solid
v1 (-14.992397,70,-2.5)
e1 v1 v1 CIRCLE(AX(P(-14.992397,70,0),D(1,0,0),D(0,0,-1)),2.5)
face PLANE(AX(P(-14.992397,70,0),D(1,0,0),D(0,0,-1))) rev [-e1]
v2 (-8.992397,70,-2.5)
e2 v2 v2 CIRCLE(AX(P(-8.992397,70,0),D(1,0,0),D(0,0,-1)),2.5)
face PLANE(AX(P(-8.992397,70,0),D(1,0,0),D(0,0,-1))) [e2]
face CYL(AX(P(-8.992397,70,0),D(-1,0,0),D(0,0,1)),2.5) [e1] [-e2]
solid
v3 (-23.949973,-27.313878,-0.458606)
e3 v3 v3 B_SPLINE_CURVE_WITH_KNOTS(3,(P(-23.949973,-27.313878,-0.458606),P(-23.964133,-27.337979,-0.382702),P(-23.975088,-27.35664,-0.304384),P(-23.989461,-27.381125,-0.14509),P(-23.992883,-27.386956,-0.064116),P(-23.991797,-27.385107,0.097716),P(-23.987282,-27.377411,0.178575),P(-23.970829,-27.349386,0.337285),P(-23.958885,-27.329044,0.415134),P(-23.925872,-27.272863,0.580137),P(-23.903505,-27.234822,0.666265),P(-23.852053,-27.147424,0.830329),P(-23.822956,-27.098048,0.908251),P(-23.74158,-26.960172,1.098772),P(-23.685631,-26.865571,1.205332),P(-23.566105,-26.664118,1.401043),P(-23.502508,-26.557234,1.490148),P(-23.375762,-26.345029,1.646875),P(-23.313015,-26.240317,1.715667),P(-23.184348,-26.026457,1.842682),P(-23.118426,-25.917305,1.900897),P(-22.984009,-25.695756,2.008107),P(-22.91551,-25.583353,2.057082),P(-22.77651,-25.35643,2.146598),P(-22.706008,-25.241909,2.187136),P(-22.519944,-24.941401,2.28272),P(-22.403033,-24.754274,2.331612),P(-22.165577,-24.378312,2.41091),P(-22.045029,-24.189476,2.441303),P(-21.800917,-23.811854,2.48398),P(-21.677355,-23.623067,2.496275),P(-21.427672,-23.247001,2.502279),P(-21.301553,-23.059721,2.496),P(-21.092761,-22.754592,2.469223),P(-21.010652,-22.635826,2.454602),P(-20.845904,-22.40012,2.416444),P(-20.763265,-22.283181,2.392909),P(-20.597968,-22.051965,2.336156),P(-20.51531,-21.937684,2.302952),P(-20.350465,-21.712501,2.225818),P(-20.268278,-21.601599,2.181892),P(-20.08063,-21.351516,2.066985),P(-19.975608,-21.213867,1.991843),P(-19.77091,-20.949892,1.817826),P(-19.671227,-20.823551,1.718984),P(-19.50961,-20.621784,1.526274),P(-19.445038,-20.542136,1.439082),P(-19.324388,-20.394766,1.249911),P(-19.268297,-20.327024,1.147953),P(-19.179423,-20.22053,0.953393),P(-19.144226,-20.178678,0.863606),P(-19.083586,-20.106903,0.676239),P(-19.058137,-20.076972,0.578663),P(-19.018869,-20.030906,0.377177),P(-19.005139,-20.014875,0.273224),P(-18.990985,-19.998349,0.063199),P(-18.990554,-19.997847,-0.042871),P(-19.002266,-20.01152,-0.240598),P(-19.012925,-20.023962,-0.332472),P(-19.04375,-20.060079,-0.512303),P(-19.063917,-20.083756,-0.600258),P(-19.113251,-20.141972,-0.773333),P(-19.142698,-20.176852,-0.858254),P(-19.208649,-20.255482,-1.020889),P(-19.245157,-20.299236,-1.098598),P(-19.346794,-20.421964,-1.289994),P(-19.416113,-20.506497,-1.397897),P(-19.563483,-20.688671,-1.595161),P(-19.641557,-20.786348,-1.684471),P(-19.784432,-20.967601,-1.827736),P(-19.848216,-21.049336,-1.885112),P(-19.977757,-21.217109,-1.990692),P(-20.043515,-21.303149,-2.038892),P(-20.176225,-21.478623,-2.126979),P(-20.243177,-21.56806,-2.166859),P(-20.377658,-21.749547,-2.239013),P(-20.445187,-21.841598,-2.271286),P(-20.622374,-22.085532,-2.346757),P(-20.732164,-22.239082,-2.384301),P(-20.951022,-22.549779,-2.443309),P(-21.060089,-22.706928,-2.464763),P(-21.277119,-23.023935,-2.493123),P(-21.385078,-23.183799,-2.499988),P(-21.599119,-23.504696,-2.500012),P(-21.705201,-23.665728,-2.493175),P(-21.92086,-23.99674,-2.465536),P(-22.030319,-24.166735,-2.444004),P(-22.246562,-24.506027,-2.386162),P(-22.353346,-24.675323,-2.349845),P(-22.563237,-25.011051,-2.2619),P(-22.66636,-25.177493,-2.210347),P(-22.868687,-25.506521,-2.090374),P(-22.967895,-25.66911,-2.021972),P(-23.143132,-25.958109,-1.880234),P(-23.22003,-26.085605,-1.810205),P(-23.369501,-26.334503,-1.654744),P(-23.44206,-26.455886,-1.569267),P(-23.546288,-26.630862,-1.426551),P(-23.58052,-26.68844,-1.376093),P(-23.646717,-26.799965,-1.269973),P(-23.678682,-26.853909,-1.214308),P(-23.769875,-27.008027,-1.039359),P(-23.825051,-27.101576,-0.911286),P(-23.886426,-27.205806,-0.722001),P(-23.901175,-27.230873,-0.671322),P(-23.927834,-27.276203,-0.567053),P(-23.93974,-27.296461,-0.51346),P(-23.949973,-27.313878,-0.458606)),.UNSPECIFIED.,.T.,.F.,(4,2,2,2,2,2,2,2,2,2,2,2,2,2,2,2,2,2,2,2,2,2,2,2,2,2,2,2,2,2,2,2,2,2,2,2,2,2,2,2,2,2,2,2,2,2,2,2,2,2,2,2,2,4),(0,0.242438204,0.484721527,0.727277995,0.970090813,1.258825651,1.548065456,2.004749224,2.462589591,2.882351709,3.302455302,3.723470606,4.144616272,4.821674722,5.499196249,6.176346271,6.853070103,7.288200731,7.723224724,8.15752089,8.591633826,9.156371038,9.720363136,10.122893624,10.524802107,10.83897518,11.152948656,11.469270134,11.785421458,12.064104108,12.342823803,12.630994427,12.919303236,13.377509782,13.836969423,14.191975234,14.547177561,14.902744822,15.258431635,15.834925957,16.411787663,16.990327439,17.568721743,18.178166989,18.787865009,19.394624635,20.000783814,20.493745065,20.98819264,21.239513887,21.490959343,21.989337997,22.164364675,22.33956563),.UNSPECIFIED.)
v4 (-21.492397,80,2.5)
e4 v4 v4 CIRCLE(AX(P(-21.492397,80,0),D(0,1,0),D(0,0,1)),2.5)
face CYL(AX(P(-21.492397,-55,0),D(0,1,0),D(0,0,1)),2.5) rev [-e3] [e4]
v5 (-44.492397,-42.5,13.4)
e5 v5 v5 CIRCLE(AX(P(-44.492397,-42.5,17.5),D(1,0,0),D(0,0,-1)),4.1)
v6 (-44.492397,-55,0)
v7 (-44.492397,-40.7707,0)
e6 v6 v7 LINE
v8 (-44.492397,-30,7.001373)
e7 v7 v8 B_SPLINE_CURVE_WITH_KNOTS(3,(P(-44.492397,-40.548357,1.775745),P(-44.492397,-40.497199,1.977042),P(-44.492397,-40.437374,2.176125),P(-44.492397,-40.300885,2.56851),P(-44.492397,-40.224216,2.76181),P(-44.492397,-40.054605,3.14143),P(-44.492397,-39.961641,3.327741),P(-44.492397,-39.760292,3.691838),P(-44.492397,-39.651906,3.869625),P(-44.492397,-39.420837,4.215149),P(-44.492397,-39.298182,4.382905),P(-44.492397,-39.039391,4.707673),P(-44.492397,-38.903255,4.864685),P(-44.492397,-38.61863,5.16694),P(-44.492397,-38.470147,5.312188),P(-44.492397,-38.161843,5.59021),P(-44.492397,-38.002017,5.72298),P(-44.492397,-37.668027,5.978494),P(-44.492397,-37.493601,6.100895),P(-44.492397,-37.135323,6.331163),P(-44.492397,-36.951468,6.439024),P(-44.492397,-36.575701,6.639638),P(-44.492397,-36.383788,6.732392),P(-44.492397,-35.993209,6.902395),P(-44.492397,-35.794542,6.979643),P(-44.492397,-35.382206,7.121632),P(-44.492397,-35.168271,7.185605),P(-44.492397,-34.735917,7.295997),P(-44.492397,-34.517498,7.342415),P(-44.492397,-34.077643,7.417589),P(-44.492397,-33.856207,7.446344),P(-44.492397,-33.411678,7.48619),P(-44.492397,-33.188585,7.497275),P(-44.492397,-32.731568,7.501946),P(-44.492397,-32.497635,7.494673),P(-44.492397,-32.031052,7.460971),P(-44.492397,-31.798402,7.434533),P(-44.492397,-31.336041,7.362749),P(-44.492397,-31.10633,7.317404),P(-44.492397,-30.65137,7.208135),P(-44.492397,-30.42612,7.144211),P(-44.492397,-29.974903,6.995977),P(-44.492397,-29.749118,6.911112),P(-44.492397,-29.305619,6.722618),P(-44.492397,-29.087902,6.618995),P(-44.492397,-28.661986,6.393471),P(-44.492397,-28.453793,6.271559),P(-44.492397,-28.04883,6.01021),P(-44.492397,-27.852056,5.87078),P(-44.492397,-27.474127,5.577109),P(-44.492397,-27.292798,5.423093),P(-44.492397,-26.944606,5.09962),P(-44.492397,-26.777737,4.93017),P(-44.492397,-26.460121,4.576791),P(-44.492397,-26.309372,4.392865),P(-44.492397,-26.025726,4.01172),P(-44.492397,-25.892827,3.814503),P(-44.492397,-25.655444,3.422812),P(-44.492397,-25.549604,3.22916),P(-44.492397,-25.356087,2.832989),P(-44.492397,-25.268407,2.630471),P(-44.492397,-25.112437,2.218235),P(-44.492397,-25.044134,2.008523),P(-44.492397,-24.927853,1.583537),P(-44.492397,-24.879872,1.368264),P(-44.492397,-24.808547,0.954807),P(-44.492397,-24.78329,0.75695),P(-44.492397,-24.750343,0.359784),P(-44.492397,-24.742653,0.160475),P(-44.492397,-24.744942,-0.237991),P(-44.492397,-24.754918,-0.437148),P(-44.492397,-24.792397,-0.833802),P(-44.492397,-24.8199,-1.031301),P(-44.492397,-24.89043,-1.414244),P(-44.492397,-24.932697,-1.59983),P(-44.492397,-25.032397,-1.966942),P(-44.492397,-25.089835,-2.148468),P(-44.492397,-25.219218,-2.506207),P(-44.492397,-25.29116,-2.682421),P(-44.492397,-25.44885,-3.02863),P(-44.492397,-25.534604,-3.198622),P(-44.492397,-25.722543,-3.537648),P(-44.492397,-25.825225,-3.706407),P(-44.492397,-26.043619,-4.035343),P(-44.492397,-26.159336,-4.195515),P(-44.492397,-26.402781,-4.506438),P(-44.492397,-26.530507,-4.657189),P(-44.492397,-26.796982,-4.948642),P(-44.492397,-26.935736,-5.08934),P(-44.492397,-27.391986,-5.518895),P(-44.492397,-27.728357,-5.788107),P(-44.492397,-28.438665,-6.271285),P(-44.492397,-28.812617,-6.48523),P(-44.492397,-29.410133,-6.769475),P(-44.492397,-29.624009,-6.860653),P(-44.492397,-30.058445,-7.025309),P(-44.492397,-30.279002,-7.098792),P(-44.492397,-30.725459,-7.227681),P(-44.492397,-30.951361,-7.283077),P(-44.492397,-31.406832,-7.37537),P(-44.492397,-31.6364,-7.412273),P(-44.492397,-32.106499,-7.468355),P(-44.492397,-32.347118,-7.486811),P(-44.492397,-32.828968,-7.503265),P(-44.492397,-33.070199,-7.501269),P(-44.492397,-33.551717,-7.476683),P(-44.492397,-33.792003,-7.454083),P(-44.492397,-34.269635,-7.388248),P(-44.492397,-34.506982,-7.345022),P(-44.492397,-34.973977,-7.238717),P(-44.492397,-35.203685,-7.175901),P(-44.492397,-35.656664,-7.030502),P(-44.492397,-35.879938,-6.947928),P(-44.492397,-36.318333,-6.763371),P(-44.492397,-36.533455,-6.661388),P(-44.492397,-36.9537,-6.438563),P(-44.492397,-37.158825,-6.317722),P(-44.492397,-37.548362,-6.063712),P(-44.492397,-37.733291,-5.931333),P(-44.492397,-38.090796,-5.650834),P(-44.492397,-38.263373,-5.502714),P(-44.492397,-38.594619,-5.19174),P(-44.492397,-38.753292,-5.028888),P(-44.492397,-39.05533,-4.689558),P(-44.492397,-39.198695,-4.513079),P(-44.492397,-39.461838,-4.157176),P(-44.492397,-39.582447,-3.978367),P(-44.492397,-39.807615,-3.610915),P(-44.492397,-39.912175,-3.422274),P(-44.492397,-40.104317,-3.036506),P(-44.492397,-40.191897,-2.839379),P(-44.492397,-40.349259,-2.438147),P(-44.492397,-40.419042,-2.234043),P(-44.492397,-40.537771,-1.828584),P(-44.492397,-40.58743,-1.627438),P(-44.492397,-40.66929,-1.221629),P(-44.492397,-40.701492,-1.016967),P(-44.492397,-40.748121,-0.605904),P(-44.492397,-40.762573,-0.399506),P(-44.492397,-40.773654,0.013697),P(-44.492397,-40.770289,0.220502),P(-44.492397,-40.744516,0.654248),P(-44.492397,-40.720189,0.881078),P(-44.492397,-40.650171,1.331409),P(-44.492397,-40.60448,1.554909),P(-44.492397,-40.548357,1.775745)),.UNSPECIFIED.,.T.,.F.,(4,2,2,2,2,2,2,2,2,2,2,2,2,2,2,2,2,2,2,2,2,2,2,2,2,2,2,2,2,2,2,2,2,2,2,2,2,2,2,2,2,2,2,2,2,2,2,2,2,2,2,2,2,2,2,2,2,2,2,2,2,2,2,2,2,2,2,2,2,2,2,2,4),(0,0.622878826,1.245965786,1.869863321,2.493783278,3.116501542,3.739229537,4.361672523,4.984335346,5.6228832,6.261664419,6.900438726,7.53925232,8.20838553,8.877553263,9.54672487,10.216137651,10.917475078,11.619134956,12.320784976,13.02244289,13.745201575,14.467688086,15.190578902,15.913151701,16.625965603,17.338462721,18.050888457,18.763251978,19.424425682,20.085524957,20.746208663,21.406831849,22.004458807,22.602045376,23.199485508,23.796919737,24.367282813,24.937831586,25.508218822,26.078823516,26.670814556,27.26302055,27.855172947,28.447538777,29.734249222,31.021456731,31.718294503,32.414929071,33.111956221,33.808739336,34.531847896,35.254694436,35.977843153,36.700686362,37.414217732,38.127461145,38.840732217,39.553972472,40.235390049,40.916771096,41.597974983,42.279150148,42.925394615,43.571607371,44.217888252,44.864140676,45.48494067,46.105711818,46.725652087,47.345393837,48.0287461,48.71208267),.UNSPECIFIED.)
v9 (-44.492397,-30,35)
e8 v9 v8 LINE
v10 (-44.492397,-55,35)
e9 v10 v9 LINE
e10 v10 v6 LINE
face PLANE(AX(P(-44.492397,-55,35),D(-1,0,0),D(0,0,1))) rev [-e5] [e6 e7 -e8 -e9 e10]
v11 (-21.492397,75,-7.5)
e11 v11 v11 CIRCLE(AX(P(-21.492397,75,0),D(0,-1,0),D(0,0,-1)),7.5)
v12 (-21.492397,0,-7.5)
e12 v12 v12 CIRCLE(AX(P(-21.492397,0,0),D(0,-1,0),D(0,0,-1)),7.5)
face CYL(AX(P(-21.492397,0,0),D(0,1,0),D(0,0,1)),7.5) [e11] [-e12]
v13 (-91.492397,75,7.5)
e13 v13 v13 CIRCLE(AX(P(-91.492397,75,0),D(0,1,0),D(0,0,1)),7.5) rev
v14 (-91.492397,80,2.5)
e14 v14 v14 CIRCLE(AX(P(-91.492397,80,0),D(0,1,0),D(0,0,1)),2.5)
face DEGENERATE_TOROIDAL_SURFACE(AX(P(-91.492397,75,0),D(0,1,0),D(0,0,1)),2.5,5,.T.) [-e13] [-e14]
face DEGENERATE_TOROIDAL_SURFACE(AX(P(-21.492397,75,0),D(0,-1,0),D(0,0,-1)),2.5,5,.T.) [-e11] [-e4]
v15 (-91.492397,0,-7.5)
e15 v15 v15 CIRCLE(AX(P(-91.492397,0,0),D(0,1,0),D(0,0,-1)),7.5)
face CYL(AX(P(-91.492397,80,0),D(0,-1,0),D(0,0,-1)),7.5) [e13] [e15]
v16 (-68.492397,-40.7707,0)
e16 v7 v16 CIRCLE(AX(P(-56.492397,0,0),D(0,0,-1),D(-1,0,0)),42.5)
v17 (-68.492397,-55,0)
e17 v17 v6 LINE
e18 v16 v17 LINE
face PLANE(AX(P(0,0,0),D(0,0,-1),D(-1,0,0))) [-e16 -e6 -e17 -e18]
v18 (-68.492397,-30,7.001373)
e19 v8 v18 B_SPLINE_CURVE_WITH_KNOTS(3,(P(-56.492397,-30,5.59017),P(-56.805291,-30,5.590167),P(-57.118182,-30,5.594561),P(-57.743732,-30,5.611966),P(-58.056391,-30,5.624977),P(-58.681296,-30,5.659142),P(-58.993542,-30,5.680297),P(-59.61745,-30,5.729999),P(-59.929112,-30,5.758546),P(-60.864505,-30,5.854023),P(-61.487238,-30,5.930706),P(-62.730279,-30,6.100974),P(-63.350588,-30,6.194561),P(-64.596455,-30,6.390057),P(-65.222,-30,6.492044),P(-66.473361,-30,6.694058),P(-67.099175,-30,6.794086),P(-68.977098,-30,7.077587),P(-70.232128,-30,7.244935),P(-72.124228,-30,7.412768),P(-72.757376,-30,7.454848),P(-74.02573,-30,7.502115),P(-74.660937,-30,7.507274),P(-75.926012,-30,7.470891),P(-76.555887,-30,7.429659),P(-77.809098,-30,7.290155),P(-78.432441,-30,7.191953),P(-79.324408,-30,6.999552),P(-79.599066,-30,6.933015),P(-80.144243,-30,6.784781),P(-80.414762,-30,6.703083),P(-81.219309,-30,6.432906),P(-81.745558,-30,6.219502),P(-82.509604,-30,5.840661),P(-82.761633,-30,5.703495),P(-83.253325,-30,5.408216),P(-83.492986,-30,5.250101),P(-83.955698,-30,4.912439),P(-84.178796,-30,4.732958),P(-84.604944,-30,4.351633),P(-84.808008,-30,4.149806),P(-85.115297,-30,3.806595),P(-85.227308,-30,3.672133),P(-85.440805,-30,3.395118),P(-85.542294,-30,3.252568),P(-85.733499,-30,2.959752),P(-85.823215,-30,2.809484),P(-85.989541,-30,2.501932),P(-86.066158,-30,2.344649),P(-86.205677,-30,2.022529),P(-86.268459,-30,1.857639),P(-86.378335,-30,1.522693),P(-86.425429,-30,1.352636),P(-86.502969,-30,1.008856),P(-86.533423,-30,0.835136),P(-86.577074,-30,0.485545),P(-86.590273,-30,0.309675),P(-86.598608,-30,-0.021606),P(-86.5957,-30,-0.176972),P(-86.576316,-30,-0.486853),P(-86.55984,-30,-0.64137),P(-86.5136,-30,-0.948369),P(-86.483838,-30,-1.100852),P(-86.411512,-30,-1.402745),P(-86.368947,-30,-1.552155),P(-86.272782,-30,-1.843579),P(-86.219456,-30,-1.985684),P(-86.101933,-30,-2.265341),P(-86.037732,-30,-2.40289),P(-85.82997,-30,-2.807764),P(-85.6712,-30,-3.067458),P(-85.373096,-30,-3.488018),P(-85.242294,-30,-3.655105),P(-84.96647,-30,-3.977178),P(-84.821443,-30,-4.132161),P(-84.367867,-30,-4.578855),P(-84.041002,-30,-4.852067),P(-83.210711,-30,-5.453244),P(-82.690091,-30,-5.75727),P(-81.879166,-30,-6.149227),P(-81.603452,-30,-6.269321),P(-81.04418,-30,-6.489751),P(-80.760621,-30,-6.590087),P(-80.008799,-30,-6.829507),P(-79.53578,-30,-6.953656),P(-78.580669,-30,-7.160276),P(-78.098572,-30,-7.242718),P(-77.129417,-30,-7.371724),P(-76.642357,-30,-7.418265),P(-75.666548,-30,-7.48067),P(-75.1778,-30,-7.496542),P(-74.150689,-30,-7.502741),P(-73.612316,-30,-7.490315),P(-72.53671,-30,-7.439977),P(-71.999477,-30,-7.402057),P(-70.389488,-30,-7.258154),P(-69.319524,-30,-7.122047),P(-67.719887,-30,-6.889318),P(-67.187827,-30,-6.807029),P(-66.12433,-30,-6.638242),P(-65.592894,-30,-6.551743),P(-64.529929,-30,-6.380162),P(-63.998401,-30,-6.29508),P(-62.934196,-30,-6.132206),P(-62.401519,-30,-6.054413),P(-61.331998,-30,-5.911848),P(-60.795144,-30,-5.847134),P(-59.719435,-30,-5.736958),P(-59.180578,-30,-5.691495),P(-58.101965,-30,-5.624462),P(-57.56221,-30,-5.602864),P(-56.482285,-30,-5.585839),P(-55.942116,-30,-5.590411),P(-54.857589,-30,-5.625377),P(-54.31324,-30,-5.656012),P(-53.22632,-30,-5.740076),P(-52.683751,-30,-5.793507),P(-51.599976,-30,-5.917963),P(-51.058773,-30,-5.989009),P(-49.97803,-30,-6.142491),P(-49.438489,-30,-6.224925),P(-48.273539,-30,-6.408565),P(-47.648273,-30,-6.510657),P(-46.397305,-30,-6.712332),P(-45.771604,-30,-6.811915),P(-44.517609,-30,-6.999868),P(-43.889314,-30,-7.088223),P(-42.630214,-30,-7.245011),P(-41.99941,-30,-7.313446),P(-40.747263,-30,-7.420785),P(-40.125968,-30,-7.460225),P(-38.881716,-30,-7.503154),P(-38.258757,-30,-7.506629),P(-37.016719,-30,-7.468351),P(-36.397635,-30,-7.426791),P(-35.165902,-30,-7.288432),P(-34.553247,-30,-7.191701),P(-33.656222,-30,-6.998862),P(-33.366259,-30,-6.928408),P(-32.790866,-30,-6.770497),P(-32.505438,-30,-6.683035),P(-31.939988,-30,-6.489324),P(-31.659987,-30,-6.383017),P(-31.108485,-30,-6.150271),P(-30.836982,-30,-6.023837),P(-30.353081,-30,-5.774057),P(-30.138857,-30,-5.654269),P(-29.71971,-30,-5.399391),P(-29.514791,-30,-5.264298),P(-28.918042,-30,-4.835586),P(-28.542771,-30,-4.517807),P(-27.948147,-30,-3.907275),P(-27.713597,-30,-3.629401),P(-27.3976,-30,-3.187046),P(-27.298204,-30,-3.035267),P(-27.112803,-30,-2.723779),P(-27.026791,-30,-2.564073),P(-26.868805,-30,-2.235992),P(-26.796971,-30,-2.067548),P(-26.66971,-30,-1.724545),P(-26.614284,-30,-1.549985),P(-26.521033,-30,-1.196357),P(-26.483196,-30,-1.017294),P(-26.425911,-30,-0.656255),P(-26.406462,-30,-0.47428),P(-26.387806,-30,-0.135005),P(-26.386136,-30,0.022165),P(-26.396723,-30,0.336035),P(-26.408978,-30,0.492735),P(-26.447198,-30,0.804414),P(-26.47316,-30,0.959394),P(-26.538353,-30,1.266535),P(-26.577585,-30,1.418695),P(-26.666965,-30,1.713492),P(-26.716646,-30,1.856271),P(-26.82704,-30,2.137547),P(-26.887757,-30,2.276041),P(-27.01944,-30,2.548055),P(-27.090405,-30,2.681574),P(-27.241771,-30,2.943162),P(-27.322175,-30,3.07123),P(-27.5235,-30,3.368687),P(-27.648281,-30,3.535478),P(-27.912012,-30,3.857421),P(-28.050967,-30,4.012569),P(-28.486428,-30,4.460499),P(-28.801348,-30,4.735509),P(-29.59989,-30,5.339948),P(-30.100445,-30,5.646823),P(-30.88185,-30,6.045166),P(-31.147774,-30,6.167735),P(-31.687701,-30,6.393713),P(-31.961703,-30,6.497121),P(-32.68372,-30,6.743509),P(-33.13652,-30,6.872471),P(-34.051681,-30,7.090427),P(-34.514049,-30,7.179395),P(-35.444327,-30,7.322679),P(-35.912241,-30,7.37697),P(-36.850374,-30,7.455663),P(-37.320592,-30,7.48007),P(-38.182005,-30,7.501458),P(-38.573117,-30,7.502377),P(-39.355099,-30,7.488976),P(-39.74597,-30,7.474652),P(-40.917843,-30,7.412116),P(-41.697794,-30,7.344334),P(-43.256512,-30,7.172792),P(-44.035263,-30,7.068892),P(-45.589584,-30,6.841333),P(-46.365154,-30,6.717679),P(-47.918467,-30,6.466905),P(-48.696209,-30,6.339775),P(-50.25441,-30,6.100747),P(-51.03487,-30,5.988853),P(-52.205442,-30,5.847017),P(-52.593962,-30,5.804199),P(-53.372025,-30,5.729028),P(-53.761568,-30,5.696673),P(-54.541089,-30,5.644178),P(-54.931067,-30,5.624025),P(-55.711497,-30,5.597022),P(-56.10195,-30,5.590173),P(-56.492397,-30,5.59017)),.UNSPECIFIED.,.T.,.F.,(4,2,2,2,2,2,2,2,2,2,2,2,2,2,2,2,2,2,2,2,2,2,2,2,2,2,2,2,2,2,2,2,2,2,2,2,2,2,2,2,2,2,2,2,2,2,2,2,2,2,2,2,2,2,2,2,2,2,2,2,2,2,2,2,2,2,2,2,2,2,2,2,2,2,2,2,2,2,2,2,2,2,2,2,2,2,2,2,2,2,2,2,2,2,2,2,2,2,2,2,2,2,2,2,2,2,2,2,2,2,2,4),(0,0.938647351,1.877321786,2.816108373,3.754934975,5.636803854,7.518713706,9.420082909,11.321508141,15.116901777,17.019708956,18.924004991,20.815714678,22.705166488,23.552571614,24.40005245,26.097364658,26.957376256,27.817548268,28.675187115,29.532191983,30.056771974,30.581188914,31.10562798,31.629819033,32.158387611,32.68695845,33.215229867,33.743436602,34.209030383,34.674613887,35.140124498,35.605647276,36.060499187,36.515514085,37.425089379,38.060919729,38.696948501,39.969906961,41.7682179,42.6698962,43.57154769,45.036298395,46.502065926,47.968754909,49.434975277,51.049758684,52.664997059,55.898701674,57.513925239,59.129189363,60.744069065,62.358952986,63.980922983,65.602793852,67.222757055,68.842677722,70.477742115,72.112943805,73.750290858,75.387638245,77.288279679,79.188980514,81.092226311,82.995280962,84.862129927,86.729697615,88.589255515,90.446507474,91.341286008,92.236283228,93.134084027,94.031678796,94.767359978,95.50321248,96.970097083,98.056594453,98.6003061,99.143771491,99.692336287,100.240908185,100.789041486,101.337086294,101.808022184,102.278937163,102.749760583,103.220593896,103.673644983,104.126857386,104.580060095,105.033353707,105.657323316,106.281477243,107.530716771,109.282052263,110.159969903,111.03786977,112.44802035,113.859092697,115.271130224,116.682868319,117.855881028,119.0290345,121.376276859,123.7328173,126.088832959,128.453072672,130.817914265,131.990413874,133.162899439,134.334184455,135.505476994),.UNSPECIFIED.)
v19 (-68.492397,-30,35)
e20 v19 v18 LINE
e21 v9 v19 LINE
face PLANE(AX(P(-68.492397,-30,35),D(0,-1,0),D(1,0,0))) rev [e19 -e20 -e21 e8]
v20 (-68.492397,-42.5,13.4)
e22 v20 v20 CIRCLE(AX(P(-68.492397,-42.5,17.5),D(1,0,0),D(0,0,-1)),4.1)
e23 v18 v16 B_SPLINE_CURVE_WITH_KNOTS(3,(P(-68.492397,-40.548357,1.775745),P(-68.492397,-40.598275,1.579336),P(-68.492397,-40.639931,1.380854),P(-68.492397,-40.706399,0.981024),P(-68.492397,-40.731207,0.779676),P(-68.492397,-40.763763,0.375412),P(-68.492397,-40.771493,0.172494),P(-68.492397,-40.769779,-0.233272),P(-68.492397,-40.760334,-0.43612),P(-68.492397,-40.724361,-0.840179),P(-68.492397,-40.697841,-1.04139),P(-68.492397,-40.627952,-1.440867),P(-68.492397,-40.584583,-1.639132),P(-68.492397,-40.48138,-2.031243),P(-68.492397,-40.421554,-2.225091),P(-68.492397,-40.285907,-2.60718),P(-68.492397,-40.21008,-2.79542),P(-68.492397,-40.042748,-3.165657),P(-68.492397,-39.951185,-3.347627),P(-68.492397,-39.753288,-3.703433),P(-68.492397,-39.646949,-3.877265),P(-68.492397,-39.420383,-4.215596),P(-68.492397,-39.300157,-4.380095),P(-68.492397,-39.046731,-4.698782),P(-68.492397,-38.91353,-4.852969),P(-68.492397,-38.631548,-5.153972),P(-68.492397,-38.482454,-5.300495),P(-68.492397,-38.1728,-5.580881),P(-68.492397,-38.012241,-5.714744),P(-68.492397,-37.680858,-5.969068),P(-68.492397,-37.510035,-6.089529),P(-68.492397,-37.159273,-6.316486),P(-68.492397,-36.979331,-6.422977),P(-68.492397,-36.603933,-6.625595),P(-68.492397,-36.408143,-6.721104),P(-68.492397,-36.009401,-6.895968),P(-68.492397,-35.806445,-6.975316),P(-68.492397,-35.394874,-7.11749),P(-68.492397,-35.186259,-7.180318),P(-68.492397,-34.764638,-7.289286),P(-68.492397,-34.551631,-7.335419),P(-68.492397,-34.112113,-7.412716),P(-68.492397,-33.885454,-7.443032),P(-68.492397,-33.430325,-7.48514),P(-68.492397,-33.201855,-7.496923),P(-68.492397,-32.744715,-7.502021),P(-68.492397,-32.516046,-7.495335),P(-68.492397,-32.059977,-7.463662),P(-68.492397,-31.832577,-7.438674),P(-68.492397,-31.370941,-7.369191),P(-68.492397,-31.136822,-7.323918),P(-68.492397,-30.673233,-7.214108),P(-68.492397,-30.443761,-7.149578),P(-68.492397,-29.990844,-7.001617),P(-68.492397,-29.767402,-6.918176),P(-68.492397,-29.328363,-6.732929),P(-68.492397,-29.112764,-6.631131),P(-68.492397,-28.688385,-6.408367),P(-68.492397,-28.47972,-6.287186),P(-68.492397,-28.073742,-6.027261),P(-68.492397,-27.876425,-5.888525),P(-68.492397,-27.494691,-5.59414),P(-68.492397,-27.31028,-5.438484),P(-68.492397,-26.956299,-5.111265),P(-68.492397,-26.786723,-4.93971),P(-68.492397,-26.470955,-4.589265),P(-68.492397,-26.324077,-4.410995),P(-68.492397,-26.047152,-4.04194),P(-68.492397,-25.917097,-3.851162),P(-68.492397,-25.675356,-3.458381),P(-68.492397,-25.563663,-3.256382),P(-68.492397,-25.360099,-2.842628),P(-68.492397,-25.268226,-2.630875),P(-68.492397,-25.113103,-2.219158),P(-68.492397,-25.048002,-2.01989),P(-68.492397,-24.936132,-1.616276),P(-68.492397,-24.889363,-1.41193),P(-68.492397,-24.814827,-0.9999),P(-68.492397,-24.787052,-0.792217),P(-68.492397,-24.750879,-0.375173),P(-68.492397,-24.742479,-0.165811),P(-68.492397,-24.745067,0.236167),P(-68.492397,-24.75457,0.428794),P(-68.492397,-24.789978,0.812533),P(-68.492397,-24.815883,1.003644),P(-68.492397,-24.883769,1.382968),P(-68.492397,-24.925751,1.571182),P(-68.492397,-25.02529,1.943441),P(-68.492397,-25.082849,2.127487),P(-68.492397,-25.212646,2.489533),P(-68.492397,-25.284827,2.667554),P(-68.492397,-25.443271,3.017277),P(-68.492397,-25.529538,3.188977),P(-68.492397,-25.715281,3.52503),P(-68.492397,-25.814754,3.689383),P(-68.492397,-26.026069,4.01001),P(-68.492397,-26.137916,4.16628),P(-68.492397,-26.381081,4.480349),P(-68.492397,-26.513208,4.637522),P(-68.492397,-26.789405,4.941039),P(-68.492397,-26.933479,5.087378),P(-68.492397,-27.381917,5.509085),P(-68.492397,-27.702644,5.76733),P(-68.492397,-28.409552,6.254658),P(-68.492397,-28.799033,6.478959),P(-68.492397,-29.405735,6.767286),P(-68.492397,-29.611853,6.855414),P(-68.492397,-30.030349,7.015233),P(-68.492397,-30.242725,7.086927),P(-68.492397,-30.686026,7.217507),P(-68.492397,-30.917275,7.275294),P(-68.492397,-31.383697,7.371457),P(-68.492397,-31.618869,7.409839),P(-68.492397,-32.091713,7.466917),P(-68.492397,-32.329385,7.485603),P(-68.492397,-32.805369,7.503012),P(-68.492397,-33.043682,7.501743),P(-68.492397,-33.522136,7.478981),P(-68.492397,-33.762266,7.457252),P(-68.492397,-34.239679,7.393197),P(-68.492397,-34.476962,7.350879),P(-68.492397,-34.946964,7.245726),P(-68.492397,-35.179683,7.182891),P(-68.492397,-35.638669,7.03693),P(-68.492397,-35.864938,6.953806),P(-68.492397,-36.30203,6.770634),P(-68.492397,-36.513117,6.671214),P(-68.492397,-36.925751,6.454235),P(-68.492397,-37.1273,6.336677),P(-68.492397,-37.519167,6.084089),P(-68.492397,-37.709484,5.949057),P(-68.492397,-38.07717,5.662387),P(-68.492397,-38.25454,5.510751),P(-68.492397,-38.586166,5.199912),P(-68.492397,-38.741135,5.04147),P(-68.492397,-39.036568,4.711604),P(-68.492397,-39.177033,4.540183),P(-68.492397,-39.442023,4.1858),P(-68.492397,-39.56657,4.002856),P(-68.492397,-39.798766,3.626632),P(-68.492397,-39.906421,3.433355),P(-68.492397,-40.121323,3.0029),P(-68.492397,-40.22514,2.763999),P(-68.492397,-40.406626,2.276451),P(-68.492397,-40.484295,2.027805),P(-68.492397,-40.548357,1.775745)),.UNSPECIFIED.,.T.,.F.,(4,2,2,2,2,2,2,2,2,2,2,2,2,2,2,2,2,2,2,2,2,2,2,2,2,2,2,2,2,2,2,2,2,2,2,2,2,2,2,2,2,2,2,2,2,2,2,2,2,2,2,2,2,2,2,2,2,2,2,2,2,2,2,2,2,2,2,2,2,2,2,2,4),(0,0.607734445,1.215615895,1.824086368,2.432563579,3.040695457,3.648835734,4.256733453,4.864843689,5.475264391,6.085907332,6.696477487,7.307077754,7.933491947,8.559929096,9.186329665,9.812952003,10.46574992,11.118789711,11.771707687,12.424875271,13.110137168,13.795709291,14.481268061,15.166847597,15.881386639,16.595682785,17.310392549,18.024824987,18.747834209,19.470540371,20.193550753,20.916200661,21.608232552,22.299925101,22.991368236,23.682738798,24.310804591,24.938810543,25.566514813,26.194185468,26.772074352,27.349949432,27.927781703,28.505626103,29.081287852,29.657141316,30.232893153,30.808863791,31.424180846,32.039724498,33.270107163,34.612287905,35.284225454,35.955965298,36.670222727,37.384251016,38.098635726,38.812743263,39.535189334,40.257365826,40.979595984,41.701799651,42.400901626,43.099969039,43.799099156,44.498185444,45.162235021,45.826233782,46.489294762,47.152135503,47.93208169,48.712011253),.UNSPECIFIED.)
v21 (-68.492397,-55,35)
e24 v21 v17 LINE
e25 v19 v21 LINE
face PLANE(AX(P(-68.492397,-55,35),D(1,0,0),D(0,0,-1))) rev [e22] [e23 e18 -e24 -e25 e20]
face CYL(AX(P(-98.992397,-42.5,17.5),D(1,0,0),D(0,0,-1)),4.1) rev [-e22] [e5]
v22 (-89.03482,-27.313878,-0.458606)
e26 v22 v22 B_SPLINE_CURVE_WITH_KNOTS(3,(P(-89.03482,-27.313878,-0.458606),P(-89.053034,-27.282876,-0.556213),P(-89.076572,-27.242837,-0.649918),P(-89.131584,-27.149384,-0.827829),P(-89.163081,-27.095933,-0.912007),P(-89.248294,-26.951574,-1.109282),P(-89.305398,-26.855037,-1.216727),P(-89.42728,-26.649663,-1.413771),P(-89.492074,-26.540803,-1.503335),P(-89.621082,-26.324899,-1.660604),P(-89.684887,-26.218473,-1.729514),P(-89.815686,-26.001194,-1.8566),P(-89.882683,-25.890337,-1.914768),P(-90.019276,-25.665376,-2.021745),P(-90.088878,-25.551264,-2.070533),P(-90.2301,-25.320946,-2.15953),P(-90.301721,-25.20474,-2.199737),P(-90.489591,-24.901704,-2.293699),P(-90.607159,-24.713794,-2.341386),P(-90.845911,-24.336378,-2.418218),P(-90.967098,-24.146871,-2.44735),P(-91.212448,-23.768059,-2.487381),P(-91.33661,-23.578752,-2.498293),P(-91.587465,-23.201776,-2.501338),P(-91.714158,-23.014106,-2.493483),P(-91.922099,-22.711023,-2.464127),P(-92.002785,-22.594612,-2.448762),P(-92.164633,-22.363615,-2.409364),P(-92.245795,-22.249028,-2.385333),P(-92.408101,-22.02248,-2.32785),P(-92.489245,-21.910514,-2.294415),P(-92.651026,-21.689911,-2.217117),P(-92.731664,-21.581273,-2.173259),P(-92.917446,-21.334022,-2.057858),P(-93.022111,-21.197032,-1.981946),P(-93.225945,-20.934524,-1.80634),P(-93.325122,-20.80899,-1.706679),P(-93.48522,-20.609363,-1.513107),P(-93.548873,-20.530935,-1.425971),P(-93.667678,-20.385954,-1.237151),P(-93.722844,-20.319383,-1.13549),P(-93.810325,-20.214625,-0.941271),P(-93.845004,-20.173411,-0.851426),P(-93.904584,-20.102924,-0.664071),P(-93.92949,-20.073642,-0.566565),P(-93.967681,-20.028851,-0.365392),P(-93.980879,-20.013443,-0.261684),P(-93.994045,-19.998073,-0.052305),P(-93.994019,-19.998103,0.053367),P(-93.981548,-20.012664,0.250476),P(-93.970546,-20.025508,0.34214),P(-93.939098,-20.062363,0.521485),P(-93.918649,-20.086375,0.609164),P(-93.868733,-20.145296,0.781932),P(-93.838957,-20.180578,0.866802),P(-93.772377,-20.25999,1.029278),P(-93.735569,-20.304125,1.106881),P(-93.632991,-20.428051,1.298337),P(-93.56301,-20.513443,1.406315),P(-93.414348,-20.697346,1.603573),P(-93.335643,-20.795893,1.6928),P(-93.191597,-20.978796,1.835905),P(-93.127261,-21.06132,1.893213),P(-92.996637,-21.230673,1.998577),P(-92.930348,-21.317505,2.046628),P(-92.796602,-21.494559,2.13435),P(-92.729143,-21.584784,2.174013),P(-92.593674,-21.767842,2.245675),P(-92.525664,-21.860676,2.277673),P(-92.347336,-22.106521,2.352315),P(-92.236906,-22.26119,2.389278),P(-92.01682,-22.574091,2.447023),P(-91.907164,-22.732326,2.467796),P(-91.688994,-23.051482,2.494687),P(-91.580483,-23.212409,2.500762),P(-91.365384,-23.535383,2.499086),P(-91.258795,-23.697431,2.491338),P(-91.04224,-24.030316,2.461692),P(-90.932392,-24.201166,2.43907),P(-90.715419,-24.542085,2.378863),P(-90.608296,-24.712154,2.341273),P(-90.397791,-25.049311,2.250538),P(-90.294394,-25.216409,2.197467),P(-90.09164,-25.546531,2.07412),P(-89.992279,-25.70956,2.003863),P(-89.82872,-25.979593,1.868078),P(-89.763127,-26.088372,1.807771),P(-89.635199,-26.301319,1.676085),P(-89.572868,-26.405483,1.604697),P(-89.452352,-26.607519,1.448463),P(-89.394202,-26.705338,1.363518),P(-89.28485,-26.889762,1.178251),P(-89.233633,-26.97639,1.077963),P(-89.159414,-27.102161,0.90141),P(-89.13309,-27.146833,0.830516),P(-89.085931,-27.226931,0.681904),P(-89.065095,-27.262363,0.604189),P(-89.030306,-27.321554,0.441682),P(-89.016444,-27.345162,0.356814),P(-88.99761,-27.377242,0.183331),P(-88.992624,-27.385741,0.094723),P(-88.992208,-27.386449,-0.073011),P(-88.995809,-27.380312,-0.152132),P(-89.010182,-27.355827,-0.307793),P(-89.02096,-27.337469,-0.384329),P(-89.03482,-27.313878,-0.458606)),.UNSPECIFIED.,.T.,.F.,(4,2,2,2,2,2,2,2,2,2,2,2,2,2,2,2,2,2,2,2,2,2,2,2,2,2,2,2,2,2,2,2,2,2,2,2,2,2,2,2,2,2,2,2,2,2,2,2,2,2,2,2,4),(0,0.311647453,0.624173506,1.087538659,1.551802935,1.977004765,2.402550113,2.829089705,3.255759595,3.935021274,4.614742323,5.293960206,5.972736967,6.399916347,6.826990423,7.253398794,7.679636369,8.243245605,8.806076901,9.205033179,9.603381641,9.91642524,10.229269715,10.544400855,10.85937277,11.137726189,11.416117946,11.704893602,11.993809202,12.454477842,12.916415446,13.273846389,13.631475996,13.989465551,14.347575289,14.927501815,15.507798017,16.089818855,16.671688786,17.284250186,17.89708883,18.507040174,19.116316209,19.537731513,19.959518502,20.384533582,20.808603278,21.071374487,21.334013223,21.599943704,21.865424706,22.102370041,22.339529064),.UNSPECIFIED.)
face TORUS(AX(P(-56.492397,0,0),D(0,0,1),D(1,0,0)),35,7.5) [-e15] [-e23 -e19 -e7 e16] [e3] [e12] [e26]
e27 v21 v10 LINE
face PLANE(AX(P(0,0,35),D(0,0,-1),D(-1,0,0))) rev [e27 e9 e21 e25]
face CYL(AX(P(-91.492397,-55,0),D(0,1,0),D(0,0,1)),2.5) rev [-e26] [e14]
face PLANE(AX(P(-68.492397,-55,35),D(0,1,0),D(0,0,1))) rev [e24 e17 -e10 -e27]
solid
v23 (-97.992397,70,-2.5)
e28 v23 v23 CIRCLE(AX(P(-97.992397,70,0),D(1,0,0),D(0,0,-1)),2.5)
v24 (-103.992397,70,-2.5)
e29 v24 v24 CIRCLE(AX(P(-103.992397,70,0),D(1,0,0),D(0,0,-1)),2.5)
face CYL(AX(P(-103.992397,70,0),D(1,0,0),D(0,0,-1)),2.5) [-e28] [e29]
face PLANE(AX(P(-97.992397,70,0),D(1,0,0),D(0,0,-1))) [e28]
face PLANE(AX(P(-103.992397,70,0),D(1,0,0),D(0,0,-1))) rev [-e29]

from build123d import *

# Parameters (mm, degrees)
SWEEP1_PROFILE_R        = 7.5
SKETCH7_W               = 24
SKETCH7_H               = 25
BOSS_EXTRUDE1_DEPTH     = 35
SKETCH8_R               = 4.1
CUT_EXTRUDE1_DEPTH      = 103.933230873
CUT_EXTRUDE2_DEPTH      = 133.001873463
CUT_EXTRUDE2_DEPTH_BACK = 133.001873463
SKETCH9_R               = 2.5
BOSS_EXTRUDE2_START     = 41.5
SKETCH11_R              = 2.5
BOSS_EXTRUDE2_DEPTH     = 6
BOSS_EXTRUDE3_START     = -41.5
SKETCH11_2_R            = 2.5
BOSS_EXTRUDE3_DEPTH     = 6
FILLET1_R               = 5


with BuildPart() as part:
    # Sweep1: sweep along a path in Sketch1
    with BuildLine(Plane.XY) as sweep1_path:
        Line((-91.492396531, 80), (-91.492396531, 0))
        ThreePointArc((-91.492396531, 0), (-56.492396531, -35), (-21.492396531, 0))
        Line((-21.492396531, 0), (-21.492396531, 80))
    # Sweep1 profile (on start of the path) → Sweep1 (sweep)
    with BuildSketch(Plane(origin=(-91.492396531, 80, 0), x_dir=(0, 0, -1), z_dir=(0, -1, 0))):
        Circle(SWEEP1_PROFILE_R)
    sweep(path=sweep1_path.line)

    # Sketch7 → Boss-Extrude1 (add)
    with BuildSketch(Plane.XY):
        with Locations((-56.492396531, -42.5)):
            Rectangle(SKETCH7_W, SKETCH7_H)
    extrude(amount=BOSS_EXTRUDE1_DEPTH)

    # Sketch8 → Cut-Extrude1 (cut, through all)
    with BuildSketch(Plane(origin=(-44.492396531, 0, 0), x_dir=(0, 0, -1), z_dir=(1, 0, 0))):
        with Locations((-17.5, -42.5)):
            Circle(SKETCH8_R)
    extrude(amount=-CUT_EXTRUDE1_DEPTH, mode=Mode.SUBTRACT)

    # Sketch9 → Cut-Extrude2 (cut, two sides: drawn at the far end of the back side and taken through both)
    with BuildSketch(Plane(origin=(0, 0, 0), x_dir=(1, 0, 0), z_dir=(0, 1, 0)).offset(-CUT_EXTRUDE2_DEPTH_BACK)):
        with Locations(Location((-91.492396531, 0, 0), (0, 0, 270))):
            Circle(SKETCH9_R)
        with Locations(Location((-21.492396531, 0, 0), (0, 0, 270))):
            Circle(SKETCH9_R)
    extrude(amount=CUT_EXTRUDE2_DEPTH + CUT_EXTRUDE2_DEPTH_BACK, mode=Mode.SUBTRACT)

    # Fillet1
    fillet1_edges = [part.edges().sort_by_distance(p)[0] for p in [
        (-21.492396531, 80, 7.5),
        (-91.492396531, 80, 7.5),
    ]]
    fillet(fillet1_edges, radius=FILLET1_R - 0.0001)  # a hair under: the kernel refuses the full size


with BuildPart() as body_2:
    # Sketch11 → Boss-Extrude2 (new body)
    with BuildSketch(Plane(origin=(-56.492396531, 0, 0), x_dir=(0, 0, -1), z_dir=(1, 0, 0)).offset(BOSS_EXTRUDE2_START)):
        with Locations((0, 70)):
            Circle(SKETCH11_R)
    extrude(amount=BOSS_EXTRUDE2_DEPTH)


with BuildPart() as body_3:
    # Sketch11<2> → Boss-Extrude3 (new body)
    with BuildSketch(Plane(origin=(-56.492396531, 0, 0), x_dir=(0, 0, -1), z_dir=(1, 0, 0)).offset(BOSS_EXTRUDE3_START)):
        with Locations((0, 70)):
            Circle(SKETCH11_2_R)
    extrude(amount=-BOSS_EXTRUDE3_DEPTH)


solid = Compound([part.part, body_2.part, body_3.part])
